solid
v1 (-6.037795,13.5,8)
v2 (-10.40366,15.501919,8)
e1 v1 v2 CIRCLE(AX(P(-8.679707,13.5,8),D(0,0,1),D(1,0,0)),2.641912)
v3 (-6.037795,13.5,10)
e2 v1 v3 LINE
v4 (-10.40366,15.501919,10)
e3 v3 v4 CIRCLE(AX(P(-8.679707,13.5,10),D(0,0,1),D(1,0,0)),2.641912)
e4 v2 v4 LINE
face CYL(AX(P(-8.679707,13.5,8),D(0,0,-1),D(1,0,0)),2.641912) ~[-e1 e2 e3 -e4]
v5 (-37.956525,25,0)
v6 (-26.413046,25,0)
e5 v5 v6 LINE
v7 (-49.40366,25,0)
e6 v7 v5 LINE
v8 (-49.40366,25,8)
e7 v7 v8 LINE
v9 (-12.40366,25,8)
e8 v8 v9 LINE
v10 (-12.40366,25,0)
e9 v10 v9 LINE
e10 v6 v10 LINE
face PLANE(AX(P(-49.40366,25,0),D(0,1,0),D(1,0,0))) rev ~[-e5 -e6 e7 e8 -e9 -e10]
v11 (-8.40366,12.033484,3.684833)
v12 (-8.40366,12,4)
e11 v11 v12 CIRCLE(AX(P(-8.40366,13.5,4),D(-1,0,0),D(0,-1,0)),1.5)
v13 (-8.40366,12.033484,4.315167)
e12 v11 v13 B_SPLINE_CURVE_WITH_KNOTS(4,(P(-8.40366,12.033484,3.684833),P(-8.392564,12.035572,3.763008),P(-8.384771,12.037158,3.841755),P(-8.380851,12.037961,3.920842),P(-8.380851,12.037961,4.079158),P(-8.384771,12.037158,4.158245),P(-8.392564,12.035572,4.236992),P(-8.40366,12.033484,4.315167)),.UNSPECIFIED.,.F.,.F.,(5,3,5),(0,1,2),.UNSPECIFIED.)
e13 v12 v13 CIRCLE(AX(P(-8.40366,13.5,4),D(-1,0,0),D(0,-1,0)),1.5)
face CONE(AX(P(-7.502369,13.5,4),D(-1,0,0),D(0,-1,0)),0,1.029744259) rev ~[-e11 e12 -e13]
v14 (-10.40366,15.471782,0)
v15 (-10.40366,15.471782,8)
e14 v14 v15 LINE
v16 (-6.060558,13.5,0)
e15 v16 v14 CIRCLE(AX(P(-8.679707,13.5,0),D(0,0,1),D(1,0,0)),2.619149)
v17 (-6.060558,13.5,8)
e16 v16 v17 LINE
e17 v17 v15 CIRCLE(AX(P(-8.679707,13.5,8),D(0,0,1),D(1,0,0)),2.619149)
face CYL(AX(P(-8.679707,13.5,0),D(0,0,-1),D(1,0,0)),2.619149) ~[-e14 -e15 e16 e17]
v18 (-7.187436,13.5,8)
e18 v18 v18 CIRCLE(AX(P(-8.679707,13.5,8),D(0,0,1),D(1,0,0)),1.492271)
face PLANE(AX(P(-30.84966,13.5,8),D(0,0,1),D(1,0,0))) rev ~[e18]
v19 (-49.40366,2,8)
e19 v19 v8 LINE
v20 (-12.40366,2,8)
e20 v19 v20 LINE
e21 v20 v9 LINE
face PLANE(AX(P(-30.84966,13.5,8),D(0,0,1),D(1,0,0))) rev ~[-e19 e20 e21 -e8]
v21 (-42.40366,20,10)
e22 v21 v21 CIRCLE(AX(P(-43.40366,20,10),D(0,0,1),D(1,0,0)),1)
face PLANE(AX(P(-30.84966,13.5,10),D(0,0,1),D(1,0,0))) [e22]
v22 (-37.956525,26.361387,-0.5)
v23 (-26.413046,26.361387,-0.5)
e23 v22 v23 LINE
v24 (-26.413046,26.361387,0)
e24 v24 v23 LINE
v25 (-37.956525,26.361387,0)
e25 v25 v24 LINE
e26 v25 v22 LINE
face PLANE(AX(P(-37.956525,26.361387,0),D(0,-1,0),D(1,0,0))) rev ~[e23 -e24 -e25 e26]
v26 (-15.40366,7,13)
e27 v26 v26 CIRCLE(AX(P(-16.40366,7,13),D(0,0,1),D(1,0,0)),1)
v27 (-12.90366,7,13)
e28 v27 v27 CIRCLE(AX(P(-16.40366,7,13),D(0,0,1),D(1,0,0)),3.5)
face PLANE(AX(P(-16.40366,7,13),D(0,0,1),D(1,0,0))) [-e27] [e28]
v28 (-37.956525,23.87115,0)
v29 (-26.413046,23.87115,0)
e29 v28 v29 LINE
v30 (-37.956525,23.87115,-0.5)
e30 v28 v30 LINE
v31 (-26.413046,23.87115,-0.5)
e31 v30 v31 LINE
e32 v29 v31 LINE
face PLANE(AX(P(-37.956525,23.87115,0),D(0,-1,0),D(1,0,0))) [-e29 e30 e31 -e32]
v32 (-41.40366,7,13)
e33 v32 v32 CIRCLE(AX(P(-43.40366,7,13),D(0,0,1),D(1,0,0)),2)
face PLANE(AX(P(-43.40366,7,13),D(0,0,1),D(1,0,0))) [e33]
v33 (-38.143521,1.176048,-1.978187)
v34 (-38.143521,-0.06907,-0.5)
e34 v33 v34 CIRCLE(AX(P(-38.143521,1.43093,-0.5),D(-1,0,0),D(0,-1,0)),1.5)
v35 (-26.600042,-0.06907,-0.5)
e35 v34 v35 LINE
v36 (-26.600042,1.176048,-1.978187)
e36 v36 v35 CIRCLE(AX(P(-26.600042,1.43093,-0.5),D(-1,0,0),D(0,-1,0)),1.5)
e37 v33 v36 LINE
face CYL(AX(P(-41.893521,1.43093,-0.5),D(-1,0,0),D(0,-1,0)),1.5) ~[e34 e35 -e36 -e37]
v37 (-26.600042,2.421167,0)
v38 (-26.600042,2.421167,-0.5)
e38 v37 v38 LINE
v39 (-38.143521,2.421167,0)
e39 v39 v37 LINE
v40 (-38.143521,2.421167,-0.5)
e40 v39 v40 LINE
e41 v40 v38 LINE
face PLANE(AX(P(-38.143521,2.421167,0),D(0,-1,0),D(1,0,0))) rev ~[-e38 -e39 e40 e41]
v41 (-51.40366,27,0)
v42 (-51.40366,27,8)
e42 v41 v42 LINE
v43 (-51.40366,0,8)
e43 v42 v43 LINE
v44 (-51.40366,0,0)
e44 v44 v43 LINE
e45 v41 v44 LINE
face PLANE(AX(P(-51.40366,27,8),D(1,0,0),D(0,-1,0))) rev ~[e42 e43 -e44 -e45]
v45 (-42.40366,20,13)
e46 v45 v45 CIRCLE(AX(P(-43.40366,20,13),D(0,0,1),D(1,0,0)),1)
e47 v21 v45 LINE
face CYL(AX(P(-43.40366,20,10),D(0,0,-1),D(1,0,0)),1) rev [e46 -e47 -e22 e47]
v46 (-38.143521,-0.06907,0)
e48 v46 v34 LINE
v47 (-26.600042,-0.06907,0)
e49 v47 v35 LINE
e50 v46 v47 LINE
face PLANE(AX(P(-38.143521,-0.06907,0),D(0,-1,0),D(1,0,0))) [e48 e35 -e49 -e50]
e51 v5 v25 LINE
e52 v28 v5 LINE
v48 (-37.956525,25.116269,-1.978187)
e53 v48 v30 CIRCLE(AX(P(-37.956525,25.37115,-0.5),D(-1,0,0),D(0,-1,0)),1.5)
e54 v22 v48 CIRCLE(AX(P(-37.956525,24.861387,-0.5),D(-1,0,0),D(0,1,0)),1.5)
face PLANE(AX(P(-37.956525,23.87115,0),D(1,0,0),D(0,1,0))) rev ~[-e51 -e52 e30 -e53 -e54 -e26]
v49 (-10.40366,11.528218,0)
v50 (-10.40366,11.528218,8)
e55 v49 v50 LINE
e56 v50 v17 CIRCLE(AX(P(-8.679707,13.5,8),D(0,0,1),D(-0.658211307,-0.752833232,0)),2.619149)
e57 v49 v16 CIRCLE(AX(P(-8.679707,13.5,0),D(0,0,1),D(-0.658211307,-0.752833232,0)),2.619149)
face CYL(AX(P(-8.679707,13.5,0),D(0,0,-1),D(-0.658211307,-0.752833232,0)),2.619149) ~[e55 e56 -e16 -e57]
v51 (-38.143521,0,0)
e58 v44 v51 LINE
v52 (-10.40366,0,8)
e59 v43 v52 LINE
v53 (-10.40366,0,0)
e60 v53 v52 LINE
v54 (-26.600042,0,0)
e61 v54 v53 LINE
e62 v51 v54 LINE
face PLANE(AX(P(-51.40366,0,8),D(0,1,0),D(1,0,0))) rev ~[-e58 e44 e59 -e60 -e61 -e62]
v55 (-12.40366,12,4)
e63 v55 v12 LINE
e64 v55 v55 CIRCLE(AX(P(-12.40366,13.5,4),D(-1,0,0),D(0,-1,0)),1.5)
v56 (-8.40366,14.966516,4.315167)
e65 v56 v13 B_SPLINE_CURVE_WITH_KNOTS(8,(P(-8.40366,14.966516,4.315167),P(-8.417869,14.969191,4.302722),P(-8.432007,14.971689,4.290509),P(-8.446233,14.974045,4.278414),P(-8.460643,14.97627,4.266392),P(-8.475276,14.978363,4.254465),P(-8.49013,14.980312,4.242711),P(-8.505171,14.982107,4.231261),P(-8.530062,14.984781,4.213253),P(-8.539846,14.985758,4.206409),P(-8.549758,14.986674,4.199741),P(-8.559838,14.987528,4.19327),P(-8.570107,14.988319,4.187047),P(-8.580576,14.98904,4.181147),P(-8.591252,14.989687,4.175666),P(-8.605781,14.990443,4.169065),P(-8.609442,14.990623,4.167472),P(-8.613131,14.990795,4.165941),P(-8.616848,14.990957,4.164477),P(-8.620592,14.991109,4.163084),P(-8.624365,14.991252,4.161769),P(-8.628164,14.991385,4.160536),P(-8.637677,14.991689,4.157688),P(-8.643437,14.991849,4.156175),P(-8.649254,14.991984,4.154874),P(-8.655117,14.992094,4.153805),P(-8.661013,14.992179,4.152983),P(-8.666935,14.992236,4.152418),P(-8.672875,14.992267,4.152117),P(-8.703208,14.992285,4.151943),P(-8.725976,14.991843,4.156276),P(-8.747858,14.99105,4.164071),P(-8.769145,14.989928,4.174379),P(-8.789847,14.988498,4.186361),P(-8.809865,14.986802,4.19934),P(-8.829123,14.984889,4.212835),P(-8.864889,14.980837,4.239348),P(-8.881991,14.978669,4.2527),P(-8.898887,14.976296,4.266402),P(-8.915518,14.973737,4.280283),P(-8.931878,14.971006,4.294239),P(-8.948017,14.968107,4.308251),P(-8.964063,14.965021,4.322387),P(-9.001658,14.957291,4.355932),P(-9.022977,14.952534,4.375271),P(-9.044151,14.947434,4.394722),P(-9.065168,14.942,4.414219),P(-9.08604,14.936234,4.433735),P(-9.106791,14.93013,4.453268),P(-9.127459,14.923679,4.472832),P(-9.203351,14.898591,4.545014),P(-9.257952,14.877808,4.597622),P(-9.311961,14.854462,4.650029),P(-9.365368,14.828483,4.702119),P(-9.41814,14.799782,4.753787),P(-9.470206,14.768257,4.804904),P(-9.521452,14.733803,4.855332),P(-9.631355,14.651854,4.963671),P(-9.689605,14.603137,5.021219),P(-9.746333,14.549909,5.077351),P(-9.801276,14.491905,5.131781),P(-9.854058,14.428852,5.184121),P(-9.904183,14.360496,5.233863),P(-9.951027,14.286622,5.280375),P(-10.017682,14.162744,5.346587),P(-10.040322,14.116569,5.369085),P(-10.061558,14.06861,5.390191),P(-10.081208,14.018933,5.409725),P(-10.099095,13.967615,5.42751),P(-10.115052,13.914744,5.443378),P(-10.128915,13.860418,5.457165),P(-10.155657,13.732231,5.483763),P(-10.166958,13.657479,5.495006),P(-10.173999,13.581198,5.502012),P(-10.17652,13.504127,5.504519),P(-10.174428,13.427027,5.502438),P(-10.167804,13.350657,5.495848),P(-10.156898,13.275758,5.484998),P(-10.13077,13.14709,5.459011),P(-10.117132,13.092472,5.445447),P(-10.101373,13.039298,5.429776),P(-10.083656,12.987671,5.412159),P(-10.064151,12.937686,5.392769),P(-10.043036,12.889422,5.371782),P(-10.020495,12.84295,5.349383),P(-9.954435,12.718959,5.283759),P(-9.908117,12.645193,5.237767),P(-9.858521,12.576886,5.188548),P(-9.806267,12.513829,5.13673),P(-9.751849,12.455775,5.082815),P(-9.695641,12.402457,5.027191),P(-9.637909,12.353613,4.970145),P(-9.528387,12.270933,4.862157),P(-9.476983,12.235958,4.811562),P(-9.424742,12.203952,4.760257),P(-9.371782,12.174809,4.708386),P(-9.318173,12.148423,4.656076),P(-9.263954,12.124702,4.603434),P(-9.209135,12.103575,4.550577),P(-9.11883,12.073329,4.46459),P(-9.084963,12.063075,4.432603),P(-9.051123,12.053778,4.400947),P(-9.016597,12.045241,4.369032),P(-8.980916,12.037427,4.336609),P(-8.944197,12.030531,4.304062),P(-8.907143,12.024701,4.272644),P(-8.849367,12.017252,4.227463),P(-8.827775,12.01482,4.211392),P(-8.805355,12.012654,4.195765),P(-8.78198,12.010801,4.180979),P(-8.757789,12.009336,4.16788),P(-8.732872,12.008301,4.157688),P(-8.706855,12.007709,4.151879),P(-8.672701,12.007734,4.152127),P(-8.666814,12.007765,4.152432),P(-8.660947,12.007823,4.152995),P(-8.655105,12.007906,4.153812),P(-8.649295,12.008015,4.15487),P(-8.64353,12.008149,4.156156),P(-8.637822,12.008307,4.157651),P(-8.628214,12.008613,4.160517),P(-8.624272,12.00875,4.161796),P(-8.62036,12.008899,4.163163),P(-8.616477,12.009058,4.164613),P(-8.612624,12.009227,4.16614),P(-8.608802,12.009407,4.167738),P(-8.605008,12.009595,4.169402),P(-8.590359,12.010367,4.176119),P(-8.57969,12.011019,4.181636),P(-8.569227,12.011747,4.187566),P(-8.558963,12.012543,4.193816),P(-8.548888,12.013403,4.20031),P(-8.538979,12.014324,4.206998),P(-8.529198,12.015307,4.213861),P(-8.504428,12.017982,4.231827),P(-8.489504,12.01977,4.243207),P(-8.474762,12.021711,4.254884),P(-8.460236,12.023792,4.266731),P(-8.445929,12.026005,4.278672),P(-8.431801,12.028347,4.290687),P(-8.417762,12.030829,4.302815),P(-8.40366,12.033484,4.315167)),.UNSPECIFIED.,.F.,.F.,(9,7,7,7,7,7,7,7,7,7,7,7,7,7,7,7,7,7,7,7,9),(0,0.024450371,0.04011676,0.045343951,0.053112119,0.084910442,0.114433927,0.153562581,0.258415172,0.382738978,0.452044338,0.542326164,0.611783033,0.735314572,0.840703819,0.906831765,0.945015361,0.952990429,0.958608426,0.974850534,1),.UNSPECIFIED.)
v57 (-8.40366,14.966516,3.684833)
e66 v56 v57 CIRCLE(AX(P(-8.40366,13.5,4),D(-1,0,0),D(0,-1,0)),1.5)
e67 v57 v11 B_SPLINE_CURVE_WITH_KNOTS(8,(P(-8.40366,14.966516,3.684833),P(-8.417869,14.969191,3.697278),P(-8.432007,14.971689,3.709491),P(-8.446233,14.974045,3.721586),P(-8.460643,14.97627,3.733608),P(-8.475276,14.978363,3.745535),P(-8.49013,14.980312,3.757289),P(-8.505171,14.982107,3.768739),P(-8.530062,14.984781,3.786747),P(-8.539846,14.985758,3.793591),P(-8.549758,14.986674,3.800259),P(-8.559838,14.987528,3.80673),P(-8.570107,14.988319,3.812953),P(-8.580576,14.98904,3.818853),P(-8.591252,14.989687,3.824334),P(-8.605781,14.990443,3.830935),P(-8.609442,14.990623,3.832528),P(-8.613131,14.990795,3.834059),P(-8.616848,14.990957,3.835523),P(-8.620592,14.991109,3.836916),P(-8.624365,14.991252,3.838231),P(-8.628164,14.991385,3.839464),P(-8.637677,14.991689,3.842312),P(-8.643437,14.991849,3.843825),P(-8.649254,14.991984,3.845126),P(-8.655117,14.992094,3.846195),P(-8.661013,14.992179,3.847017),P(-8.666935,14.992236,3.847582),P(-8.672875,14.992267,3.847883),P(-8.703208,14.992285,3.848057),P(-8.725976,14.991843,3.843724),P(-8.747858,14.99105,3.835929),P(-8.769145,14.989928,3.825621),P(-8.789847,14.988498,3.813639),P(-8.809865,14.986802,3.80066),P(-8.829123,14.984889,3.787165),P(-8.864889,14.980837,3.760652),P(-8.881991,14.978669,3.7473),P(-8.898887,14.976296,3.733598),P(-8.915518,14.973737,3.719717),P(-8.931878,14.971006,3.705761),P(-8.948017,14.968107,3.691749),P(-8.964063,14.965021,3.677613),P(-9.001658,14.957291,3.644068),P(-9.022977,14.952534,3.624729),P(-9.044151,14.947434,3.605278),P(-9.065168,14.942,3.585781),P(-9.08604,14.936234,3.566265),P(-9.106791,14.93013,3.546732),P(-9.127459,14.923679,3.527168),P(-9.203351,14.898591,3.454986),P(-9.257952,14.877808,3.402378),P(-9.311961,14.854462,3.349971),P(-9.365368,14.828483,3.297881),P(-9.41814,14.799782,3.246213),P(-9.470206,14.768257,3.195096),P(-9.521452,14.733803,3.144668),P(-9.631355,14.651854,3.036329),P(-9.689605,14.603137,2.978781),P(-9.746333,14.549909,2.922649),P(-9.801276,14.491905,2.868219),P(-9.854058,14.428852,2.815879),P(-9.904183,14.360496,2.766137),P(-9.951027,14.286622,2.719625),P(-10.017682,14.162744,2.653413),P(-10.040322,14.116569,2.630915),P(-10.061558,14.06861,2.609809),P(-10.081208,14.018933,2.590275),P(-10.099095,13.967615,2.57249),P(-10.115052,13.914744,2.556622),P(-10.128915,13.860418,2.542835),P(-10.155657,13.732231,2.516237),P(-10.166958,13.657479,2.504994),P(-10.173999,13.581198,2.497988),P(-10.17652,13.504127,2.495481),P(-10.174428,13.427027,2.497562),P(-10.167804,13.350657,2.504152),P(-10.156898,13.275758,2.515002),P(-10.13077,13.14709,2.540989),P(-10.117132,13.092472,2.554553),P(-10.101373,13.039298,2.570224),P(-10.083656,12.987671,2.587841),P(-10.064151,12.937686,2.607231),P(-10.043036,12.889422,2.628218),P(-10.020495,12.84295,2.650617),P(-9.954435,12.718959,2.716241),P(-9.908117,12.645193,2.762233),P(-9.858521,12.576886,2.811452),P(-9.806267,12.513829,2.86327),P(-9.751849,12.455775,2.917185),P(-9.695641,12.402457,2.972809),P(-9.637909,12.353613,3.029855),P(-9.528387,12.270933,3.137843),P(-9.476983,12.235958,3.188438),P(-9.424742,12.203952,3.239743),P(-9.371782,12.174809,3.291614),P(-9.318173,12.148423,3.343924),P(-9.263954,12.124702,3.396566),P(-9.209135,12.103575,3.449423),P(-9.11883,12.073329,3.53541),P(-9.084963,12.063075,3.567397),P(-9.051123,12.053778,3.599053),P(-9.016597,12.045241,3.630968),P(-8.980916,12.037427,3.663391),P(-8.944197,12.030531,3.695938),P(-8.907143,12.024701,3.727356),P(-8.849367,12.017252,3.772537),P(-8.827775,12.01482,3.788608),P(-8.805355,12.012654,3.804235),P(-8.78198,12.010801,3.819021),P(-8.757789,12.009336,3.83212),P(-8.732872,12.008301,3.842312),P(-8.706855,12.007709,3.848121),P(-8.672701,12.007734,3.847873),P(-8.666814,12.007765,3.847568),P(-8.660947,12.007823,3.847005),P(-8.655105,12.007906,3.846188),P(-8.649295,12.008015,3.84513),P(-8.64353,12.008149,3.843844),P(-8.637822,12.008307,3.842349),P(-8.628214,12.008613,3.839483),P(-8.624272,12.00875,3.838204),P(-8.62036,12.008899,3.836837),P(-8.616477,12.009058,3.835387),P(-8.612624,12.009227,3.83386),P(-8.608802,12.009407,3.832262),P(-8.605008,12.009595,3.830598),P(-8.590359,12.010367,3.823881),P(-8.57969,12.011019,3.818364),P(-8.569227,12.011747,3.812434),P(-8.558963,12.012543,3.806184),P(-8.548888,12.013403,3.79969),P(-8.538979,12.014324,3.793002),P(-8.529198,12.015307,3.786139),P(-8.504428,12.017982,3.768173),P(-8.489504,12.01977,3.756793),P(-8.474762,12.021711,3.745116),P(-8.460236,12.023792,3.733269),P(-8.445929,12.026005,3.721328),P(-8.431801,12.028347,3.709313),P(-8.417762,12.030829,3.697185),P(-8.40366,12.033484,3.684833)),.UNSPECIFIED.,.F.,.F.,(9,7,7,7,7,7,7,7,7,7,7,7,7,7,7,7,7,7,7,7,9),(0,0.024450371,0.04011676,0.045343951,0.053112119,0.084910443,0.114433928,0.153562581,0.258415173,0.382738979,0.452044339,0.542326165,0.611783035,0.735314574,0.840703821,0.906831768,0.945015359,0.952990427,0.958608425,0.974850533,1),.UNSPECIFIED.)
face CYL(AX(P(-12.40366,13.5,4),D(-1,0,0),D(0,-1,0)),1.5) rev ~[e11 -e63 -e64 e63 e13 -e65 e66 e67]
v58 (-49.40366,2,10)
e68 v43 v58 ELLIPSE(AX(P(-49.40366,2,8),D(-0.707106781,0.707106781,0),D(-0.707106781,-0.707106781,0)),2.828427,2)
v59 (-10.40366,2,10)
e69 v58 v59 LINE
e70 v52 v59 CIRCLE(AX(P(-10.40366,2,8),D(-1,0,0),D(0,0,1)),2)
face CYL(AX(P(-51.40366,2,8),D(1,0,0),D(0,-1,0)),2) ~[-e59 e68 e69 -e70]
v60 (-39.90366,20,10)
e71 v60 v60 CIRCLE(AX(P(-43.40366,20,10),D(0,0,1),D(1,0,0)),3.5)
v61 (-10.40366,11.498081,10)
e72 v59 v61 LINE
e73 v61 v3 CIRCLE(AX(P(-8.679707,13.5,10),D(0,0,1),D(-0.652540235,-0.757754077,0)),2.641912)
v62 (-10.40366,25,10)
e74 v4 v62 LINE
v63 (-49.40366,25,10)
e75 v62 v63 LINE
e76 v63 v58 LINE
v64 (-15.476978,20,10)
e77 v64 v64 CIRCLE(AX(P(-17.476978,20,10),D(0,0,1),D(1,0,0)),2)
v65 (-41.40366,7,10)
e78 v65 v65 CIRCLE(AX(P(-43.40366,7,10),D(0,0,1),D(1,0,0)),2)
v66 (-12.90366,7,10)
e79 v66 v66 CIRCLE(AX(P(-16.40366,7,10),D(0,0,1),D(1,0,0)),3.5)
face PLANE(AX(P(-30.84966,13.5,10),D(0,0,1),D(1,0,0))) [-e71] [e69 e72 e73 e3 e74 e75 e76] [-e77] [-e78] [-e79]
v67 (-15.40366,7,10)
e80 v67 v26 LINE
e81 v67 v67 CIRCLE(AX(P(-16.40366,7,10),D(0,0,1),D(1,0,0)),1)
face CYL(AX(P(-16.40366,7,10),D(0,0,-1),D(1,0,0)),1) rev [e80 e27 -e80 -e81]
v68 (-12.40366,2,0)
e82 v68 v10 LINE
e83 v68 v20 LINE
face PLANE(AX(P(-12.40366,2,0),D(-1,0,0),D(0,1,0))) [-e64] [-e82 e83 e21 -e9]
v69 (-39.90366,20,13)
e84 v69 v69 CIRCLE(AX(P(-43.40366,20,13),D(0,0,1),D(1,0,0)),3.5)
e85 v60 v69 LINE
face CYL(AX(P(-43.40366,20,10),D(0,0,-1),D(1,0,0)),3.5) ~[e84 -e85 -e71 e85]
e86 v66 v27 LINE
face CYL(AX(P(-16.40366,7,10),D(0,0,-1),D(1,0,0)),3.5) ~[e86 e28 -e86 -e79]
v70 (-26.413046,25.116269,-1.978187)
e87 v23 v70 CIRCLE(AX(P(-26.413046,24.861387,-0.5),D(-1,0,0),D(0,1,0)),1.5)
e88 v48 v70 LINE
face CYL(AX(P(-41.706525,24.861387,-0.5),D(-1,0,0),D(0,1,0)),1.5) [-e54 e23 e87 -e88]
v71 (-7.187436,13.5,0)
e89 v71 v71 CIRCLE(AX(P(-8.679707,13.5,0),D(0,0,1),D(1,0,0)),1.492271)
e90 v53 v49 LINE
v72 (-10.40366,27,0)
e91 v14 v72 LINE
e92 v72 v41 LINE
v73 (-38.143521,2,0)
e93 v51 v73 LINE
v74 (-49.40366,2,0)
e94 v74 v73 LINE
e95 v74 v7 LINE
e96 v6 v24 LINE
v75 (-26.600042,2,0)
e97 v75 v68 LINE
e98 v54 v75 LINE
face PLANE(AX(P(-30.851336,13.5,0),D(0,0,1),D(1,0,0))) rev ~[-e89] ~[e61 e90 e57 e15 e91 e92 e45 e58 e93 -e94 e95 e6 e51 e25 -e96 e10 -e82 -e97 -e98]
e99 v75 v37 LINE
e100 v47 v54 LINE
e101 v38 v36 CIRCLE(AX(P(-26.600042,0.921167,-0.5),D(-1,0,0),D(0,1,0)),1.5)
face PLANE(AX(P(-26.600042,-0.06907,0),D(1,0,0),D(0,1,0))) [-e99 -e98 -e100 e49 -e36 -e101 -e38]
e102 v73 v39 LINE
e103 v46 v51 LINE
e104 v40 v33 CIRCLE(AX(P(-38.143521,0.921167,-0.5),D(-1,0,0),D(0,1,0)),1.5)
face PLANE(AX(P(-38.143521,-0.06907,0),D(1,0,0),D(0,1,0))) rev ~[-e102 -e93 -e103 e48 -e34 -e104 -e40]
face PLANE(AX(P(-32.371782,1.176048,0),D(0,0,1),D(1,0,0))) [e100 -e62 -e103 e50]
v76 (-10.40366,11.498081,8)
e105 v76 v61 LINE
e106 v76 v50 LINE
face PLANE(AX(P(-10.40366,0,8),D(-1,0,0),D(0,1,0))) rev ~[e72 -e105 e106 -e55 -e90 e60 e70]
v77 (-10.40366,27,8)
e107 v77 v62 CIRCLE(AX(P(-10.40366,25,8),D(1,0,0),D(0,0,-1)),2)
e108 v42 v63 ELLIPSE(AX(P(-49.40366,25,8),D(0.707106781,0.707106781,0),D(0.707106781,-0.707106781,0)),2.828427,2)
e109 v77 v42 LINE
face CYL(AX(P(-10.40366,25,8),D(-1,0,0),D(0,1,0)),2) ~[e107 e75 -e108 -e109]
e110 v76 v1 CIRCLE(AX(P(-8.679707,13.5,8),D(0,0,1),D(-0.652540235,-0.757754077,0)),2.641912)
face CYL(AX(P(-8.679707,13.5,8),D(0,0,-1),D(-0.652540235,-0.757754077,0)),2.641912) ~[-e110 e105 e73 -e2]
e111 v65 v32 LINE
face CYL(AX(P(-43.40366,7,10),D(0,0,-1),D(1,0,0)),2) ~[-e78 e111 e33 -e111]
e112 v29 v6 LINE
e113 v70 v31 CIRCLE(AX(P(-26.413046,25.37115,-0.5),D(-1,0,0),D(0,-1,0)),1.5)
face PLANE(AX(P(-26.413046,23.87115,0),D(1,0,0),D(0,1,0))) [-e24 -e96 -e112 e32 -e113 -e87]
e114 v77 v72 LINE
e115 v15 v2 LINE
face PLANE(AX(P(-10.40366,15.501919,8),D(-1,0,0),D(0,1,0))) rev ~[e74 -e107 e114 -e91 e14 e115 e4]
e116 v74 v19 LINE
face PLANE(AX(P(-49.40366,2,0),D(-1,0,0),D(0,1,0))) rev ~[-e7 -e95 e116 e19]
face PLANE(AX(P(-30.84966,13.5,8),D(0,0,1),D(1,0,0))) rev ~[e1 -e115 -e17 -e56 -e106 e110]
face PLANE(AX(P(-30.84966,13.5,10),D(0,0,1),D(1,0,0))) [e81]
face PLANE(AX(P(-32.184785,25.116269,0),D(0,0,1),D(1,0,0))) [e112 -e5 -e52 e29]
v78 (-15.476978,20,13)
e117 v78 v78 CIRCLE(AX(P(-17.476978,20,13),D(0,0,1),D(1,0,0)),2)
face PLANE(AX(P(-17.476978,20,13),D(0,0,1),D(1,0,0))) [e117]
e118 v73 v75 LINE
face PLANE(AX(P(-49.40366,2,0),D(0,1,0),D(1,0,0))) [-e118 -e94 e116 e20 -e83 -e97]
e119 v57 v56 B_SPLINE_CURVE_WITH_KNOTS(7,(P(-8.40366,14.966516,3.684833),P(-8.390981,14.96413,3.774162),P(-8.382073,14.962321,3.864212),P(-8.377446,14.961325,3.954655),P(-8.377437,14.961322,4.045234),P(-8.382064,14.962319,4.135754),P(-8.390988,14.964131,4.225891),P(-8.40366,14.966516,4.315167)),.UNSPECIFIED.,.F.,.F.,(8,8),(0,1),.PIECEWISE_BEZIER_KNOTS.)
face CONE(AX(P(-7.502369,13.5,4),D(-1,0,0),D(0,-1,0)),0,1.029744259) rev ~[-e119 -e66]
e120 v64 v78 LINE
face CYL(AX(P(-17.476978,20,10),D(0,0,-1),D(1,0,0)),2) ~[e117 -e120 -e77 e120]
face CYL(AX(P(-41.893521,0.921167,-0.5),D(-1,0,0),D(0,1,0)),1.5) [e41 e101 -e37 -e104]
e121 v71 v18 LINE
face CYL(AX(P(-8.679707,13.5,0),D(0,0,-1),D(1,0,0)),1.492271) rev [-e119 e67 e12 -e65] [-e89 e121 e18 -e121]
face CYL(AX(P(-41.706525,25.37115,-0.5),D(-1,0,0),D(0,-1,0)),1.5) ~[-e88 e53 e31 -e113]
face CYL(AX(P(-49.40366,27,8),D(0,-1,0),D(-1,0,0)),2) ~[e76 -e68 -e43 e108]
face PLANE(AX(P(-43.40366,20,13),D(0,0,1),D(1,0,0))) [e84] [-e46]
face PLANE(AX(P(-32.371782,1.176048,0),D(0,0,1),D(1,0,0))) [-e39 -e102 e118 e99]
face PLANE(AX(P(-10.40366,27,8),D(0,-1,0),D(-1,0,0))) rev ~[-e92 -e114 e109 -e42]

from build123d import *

# Parameters (mm, degrees)
F0_W         = 37
F0_H         = 23
F0_R         = 1.4922705886
F1_DEPTH     = 8
F3_D         = 3
F3_DEPTH     = 4
F3_TIP       = 0.9012909285
F5_DEPTH     = 2
F6_R         = 2
F7_W         = 11.5434788167
F7_H         = 2.4902373552
F8_DEPTH     = 2
F9_T1_DEPTH  = 19.0434788167
F10_T1_DEPTH = 19.0434788167
F11_R        = 3.5
F11_R_2      = 1
F11_R_3      = 2
F12_DEPTH    = 3


# Not quite as in the source:
# - a fillet or chamfer that OpenCascade refuses, or shapes differently, is made with other operations: its cross-section is extruded or revolved along the edge and cut away or added


with BuildPart() as f1:
    # F0 (on Top) → F1 (new body)
    with BuildSketch(Plane.XY):
        with BuildLine():
            Line((-10.4036603272, 27), (-51.4036603272, 27))
            Line((-51.4036603272, 27), (-51.4036603272, 0))
            Line((-51.4036603272, 0), (-10.4036603272, 0))
            Line((-10.4036603272, 0), (-10.4036603272, 11.5282175104))
            ThreePointArc((-10.4036603272, 11.5282175104), (-11.2988558778, 13.5), (-10.4036603272, 15.4717824896))
            Line((-10.4036603272, 15.4717824896), (-10.4036603272, 27))
        make_face()
        with Locations((-30.9036603272, 13.5)):
            Rectangle(F0_W, F0_H, mode=Mode.SUBTRACT)
        with BuildLine():
            ThreePointArc((-6.0605576566, 13.5), (-7.5969670408, 15.8848724805), (-10.4036603272, 15.4717824896))
            Line((-10.4036603272, 15.4717824896), (-10.4036603272, 11.5282175104))
            ThreePointArc((-10.4036603272, 11.5282175104), (-7.5969670408, 11.1151275195), (-6.0605576566, 13.5))
        make_face()
        with Locations((-8.6797067672, 13.5)):
            Circle(F0_R, mode=Mode.SUBTRACT)
        with BuildLine():
            Line((-10.4036603272, 11.5282175104), (-10.4036603272, 15.4717824896))
            ThreePointArc((-10.4036603272, 15.4717824896), (-11.2988558778, 13.5), (-10.4036603272, 11.5282175104))
        make_face()
    extrude(amount=F1_DEPTH)

    # F3 (one way)
    with BuildSketch(Plane(origin=(-12.4036603272, 0, 0), x_dir=(0, -1, 0), z_dir=(-1, 0, 0))):
        with Locations((-13.5, 4)):
            Circle(F3_D / 2)
    extrude(amount=-F3_DEPTH, mode=Mode.SUBTRACT)
    with Locations(Plane(origin=(-12.4036603272, 0, 0), x_dir=(0, -1, 0), z_dir=(-1, 0, 0))):
        with Locations((-13.5, 4)):
            with Locations((0, 0, -(F3_DEPTH + F3_TIP / 2))):  # 118° drill point
                Cone(0, F3_D / 2, F3_TIP, mode=Mode.SUBTRACT)

    # F4 (on face) → F5 (join)
    with BuildSketch(Plane.XY.offset(8)):
        with BuildLine():
            Line((-10.4036603272, 27), (-51.4036603272, 27))
            Line((-51.4036603272, 27), (-51.4036603272, 0))
            Line((-51.4036603272, 0), (-10.4036603272, 0))
            Line((-10.4036603272, 0), (-10.4036603272, 11.4980807802))
            ThreePointArc((-10.4036603272, 11.4980807802), (-11.3216182797, 13.5), (-10.4036603272, 15.5019192198))
            Line((-10.4036603272, 15.5019192198), (-10.4036603272, 27))
        make_face()
        with BuildLine():
            ThreePointArc((-6.0377952547, 13.5), (-7.5785338283, 15.9014817506), (-10.4036603272, 15.5019192198))
            Line((-10.4036603272, 15.5019192198), (-10.4036603272, 11.4980807802))
            ThreePointArc((-10.4036603272, 11.4980807802), (-7.5785338283, 11.0985182494), (-6.0377952547, 13.5))
        make_face()
        with BuildLine():
            Line((-10.4036603272, 11.4980807802), (-10.4036603272, 15.5019192198))
            ThreePointArc((-10.4036603272, 15.5019192198), (-11.3216182797, 13.5), (-10.4036603272, 11.4980807802))
        make_face()
    extrude(amount=F5_DEPTH)

    # F6
    f6_edges = [f1.edges().sort_by_distance(p)[0] for p in [
        (-51.40366, 13.5, 10),
        (-30.90366, 27, 10),
        (-30.90366, 0, 10),
    ]]
    fillet(f6_edges, radius=F6_R)

    # F7 (on Top) → F8 (join)
    with BuildSketch(Plane.XY):
        with Locations((-32.3717817664, 1.1760484776)):
            Rectangle(F7_W, F7_H)
        with Locations((-32.1847852319, 25.1162685454)):
            Rectangle(F7_W, F7_H)
    extrude(amount=-F8_DEPTH)

    # F9: fillet of radius 1.5 on 2 edges, made by hand

    # F9_s2 → F9_t1 (cut)
    with BuildSketch(Plane.YZ.offset(-41.7065246403)):
        with BuildLine():
            ThreePointArc((26.361387223, -0.5), (25.9220473948, -1.5606601718), (24.861387223, -2))
            Line((24.861387223, -2), (26.361387223, -2))
            Line((26.361387223, -2), (26.361387223, -0.5))
        make_face()
        with BuildLine():
            ThreePointArc((23.8711498678, -0.5), (24.310489696, -1.5606601718), (25.3711498678, -2))
            Line((25.3711498678, -2), (23.8711498678, -2))
            Line((23.8711498678, -2), (23.8711498678, -0.5))
        make_face()
    extrude(amount=F9_T1_DEPTH, mode=Mode.SUBTRACT)

    # F10: fillet of radius 1.5 on 2 edges, made by hand

    # F10_s2 → F10_t1 (cut)
    with BuildSketch(Plane.YZ.offset(-41.8935211748)):
        with BuildLine():
            ThreePointArc((2.4211671553, -0.5), (1.981827327, -1.5606601718), (0.9211671553, -2))
            Line((0.9211671553, -2), (2.4211671553, -2))
            Line((2.4211671553, -2), (2.4211671553, -0.5))
        make_face()
        with BuildLine():
            ThreePointArc((-0.0690702, -0.5), (0.3702696283, -1.5606601718), (1.4309298, -2))
            Line((1.4309298, -2), (-0.0690702, -2))
            Line((-0.0690702, -2), (-0.0690702, -0.5))
        make_face()
    extrude(amount=F10_T1_DEPTH, mode=Mode.SUBTRACT)

    # F11 (on face) → F12 (join)
    with BuildSketch(Plane.XY.offset(10)):
        with Locations((-16.4036603272, 7)):
            Circle(F11_R)
        with Locations((-16.4036603272, 7)):
            Circle(F11_R_2, mode=Mode.SUBTRACT)
        with Locations((-43.4036603272, 7)):
            Circle(F11_R_3)
        with Locations((-43.4036603272, 20)):
            Circle(F11_R)
        with Locations((-43.4036603272, 20)):
            Circle(F11_R_2, mode=Mode.SUBTRACT)
        with Locations((-17.4769777805, 20)):
            Circle(F11_R_3)
    extrude(amount=F12_DEPTH)


solid = f1.part
